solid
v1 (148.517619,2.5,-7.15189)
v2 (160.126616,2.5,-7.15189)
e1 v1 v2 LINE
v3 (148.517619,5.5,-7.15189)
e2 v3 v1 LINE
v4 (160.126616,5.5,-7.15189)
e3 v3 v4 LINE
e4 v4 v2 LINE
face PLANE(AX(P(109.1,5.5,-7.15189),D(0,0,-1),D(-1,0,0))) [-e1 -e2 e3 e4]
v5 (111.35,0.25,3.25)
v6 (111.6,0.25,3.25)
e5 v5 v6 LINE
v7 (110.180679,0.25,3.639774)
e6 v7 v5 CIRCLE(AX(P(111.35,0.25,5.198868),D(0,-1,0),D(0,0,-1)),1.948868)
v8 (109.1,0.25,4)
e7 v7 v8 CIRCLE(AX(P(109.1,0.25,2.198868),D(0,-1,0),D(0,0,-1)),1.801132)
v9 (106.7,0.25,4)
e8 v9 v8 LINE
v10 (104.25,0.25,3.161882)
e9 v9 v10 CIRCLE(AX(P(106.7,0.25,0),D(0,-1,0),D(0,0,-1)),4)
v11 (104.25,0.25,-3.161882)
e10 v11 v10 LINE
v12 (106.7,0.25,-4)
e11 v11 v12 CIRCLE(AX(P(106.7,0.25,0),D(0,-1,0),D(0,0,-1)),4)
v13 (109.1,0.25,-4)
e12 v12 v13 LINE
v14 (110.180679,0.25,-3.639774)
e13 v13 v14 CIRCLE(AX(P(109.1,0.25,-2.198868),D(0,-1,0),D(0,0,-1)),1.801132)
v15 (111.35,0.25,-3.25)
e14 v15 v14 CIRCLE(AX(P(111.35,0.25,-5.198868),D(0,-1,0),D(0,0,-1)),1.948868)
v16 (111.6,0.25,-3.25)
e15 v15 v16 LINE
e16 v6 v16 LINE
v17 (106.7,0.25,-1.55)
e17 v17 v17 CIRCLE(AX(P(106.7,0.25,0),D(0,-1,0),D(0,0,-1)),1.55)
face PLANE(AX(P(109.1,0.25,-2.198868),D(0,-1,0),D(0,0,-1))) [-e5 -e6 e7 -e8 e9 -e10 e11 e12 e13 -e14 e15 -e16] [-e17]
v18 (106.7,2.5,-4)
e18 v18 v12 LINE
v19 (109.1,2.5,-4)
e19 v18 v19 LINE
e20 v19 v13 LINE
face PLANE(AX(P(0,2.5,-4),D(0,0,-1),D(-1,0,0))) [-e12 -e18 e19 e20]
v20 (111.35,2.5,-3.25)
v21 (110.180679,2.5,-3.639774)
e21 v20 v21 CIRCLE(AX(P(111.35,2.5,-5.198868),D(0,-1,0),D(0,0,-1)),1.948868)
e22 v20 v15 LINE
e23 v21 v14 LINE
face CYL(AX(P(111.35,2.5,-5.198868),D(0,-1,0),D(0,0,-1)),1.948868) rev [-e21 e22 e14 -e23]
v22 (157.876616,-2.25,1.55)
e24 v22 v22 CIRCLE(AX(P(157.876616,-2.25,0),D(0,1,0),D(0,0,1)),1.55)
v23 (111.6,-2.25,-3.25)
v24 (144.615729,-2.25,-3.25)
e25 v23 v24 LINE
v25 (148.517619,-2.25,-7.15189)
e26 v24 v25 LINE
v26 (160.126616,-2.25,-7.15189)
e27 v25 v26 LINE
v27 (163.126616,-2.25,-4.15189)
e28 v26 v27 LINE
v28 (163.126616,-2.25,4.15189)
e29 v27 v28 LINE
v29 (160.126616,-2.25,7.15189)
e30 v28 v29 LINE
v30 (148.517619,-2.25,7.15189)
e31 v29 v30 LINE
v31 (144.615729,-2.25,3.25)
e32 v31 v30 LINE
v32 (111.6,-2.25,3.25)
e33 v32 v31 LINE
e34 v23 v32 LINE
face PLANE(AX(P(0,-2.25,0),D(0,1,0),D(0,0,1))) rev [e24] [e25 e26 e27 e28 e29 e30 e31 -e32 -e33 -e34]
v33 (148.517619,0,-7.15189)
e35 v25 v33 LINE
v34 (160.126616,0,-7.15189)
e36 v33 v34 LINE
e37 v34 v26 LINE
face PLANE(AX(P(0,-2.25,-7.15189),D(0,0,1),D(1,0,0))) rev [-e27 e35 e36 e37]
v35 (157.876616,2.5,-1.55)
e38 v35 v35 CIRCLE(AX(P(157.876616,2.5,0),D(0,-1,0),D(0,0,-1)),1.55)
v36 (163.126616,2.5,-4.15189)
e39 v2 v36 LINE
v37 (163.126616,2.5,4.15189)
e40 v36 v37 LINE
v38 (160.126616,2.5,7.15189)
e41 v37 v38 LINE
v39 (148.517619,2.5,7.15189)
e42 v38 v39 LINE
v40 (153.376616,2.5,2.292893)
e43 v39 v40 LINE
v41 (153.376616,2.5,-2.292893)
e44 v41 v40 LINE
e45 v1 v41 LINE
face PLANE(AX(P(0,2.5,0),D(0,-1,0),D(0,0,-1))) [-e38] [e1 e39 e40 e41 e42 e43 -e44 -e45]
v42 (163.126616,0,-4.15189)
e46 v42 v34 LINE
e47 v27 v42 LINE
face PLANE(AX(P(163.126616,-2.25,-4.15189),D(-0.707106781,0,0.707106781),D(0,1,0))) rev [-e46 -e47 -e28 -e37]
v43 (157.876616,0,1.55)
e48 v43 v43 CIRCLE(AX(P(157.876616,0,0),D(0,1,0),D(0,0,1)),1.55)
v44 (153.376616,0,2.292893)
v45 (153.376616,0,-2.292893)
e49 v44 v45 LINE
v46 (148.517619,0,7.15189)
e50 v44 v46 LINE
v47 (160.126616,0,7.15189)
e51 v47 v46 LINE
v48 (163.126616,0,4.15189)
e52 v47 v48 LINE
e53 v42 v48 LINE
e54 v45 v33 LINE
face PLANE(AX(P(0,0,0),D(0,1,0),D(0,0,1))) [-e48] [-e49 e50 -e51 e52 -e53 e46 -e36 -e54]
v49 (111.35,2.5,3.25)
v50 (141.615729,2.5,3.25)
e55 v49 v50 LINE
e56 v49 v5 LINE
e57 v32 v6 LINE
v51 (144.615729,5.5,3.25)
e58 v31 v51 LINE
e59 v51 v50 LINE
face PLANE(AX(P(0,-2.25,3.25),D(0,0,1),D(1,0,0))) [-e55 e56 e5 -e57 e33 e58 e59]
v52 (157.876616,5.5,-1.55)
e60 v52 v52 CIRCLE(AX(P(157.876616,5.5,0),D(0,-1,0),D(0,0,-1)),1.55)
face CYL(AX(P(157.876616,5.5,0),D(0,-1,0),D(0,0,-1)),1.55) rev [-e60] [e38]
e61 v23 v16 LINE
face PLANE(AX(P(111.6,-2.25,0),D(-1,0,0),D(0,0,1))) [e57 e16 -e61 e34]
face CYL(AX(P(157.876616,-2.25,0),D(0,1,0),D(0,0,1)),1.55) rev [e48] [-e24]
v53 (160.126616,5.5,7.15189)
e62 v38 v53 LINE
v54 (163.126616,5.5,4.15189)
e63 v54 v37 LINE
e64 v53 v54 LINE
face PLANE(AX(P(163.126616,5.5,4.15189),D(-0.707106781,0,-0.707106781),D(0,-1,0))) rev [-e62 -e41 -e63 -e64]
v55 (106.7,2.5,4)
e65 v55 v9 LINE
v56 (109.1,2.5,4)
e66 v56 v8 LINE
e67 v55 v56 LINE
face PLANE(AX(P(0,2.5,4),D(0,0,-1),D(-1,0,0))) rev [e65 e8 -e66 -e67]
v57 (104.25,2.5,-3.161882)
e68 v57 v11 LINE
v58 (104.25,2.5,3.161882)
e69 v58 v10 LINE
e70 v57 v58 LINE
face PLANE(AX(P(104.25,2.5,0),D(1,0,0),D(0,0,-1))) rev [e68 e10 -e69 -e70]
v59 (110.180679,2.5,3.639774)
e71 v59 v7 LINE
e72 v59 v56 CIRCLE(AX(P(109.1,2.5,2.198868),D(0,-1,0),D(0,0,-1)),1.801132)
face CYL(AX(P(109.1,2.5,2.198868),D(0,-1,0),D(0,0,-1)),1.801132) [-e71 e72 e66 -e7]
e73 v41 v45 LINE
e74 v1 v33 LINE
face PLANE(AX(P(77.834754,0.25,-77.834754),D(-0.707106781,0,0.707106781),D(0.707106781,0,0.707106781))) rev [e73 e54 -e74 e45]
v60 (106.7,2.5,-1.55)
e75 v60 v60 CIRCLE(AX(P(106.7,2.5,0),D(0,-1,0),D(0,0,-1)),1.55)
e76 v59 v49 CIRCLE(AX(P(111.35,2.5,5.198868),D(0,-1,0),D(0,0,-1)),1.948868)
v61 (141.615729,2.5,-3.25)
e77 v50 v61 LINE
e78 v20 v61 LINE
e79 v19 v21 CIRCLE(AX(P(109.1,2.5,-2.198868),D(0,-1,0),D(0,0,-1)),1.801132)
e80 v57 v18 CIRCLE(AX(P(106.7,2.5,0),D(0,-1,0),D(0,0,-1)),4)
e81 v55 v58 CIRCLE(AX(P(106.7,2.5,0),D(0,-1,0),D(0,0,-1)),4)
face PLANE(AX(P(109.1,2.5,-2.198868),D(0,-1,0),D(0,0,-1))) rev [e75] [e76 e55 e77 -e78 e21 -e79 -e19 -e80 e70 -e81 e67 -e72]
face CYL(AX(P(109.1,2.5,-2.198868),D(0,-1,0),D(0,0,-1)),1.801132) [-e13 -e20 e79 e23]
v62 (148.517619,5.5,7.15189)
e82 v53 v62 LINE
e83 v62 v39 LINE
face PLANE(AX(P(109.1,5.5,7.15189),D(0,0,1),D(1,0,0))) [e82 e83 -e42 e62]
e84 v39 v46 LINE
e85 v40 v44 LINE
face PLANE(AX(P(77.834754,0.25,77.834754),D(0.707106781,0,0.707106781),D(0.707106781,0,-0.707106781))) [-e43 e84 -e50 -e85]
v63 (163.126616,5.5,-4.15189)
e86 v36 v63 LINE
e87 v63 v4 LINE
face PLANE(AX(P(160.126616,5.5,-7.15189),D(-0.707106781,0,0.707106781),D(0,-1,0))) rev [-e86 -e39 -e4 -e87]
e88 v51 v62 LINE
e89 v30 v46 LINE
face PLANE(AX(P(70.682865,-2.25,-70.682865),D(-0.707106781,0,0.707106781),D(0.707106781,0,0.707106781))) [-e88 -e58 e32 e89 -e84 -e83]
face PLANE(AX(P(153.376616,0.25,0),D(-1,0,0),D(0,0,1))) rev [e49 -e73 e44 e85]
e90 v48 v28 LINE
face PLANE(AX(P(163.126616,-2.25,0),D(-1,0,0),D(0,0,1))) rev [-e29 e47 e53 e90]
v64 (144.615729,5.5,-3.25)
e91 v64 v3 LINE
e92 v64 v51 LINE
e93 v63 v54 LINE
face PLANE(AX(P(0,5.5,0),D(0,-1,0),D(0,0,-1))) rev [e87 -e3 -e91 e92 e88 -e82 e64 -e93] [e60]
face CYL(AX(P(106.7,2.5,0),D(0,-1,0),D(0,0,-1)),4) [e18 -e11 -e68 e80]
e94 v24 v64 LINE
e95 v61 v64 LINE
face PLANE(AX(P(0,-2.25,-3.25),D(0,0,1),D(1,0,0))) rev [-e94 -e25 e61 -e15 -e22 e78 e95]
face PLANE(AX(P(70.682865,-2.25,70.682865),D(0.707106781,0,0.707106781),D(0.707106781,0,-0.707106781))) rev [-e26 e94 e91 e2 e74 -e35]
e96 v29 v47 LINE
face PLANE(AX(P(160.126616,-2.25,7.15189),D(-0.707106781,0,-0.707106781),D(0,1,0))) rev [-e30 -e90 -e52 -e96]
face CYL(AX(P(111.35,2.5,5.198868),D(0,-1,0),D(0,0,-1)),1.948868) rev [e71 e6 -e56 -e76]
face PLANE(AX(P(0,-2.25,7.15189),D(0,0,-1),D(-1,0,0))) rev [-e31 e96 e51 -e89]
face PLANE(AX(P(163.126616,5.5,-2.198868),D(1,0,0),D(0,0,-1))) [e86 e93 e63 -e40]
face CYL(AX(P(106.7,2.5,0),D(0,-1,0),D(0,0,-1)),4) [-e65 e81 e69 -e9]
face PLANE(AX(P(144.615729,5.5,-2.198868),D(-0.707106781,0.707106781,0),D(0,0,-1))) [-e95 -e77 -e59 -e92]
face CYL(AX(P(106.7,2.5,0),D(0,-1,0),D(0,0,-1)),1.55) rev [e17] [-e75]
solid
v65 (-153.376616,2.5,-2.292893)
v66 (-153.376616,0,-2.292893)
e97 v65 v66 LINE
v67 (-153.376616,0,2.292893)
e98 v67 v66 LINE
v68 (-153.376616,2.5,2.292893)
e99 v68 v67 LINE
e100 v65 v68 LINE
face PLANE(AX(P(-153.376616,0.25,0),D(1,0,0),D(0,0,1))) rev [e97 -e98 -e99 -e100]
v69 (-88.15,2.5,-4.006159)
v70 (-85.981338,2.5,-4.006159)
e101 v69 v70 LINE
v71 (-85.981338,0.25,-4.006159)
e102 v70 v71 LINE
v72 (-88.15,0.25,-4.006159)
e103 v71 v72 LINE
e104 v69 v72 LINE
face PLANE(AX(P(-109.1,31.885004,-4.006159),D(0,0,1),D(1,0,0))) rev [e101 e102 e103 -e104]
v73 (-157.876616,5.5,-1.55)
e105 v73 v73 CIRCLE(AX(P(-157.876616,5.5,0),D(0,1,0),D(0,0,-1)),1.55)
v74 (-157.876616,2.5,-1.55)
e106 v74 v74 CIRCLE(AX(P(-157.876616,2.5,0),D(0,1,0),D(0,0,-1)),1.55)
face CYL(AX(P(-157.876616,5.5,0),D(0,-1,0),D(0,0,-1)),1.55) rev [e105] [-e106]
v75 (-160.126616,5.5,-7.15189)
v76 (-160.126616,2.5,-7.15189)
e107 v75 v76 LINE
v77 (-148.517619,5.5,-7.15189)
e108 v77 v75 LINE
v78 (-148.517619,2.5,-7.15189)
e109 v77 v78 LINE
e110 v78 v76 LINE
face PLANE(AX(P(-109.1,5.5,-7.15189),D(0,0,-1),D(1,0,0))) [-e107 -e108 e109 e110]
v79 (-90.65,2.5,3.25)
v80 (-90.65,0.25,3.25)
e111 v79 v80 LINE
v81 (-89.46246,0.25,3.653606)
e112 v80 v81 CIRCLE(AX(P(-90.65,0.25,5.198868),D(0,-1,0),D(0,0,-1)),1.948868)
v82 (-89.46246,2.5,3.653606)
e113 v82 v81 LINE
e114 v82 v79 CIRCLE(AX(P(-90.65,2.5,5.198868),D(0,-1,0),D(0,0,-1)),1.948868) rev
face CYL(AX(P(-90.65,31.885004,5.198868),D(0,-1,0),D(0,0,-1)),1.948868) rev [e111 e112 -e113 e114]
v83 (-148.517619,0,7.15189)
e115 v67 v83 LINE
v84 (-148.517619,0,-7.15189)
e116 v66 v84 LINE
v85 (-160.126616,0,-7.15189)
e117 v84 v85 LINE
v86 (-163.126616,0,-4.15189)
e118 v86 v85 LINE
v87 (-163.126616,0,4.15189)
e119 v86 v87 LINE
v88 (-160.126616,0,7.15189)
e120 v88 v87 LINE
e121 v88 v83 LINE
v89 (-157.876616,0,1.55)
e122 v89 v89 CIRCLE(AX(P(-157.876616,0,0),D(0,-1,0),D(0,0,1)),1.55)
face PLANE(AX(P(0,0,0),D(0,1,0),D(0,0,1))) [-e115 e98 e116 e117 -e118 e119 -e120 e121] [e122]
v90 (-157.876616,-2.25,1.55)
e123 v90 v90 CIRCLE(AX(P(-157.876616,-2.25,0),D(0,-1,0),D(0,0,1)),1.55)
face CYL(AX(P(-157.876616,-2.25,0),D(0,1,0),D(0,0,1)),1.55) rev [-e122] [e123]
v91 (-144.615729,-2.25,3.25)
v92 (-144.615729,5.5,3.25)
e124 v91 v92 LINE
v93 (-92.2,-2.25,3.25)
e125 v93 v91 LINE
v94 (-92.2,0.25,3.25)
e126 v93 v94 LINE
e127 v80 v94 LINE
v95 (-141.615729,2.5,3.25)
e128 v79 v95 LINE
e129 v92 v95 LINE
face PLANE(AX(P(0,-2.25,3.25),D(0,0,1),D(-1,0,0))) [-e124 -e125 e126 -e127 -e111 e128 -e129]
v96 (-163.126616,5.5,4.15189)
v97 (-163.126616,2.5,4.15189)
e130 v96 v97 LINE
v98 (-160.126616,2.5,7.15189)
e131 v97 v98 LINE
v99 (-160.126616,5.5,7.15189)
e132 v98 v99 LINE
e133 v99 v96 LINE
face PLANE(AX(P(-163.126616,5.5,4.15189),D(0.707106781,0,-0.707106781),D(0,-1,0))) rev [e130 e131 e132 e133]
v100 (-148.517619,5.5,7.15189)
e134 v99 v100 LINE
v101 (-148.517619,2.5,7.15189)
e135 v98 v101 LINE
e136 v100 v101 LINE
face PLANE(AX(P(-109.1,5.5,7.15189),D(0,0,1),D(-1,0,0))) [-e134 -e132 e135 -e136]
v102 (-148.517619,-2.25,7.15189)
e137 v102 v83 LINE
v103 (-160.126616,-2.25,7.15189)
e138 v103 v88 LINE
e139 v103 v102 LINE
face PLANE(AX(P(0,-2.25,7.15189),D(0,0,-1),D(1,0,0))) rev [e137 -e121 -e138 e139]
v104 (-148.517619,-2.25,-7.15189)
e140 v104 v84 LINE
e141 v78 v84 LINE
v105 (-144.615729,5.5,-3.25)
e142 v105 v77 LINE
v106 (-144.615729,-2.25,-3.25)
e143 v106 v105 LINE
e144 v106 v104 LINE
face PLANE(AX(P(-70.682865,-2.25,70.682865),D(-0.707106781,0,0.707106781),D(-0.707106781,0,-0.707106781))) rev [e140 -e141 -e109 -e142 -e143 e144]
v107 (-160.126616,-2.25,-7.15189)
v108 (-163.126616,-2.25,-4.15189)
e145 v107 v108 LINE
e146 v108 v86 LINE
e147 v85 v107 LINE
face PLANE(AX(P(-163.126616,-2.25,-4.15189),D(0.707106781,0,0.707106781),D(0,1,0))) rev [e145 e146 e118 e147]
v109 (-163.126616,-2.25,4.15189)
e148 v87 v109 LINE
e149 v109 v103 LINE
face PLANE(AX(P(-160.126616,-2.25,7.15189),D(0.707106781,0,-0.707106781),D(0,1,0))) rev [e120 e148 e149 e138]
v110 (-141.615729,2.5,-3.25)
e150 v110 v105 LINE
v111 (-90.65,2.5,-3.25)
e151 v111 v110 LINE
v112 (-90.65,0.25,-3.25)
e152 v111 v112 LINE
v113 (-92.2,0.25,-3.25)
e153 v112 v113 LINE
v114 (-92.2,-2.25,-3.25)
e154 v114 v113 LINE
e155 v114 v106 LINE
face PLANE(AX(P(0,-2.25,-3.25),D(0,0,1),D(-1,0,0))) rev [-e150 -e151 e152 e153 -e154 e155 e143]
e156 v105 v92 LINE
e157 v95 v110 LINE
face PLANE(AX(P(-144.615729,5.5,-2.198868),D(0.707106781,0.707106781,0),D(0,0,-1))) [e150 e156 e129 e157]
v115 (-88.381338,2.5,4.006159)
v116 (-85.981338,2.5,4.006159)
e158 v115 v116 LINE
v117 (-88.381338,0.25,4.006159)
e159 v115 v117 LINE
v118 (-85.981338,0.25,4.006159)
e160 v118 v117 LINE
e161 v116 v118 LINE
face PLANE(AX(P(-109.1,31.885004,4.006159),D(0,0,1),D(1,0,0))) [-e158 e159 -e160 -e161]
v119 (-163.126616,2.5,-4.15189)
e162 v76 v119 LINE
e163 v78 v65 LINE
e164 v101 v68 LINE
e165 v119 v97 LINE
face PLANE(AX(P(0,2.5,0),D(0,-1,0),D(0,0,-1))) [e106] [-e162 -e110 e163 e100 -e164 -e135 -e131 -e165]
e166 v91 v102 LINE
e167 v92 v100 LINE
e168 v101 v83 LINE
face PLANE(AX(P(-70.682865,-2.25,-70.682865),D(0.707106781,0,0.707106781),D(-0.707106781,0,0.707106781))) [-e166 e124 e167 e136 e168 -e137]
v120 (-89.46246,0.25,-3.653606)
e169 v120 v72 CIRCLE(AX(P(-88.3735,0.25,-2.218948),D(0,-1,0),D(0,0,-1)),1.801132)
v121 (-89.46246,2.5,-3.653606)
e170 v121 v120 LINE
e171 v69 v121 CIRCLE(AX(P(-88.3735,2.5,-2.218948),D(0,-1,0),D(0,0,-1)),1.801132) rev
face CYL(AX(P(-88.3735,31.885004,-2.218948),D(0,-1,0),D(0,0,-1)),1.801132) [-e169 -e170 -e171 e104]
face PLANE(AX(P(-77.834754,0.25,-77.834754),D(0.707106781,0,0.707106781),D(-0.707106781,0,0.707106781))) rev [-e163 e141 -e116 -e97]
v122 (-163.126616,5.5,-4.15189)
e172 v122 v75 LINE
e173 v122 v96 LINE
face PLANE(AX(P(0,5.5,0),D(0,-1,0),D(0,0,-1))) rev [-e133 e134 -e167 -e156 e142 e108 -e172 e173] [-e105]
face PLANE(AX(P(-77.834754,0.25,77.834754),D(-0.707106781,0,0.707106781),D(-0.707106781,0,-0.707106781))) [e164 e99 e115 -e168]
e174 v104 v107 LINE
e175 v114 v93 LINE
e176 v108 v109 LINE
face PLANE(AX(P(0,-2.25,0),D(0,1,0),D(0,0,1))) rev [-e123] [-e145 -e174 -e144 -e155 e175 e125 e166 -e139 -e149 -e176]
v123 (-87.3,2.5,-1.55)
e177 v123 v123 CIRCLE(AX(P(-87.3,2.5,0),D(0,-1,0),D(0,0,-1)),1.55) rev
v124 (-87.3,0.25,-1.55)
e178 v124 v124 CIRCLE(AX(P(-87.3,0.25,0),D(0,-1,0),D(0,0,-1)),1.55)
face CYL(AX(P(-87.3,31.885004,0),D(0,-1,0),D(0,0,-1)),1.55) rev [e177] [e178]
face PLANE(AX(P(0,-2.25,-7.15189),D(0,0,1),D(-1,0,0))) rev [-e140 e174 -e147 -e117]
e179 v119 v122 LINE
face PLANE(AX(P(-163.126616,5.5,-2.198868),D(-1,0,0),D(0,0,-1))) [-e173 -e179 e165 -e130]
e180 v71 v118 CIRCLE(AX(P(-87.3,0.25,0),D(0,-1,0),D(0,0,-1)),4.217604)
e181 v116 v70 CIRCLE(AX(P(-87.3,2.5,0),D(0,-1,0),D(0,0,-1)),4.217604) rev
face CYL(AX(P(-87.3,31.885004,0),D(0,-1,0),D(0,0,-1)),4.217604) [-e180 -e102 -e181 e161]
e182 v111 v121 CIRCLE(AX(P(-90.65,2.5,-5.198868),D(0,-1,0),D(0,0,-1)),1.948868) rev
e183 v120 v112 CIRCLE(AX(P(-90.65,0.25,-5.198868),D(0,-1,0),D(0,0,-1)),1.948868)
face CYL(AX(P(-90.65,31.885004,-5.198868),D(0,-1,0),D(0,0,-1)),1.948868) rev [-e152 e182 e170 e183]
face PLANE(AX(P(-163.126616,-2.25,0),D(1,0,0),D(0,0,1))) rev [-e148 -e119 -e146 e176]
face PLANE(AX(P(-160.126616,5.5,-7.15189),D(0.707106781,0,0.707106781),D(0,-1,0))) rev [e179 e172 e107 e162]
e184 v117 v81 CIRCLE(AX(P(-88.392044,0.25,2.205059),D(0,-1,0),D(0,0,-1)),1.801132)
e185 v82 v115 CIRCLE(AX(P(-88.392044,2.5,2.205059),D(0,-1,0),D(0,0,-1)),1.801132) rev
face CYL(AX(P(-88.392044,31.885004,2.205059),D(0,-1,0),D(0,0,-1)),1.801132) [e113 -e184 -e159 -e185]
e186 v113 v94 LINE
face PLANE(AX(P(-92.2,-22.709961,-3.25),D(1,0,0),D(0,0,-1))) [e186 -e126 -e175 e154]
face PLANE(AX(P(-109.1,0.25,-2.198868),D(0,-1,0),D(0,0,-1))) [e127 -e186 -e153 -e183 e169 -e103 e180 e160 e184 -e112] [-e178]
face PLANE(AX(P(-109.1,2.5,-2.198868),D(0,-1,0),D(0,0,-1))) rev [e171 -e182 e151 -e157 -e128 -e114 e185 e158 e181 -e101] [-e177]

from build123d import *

# Parameters (mm, degrees)
SKETCH_577_R                   = 1.55
EXTRUDE_1486_DEPTH             = 2.25
EXTRUDE_1550_DEPTH             = 0.25
EXTRUDE_START                  = 0.25
SKETCH_3_R                     = 1.55
EXTRUDE_1865_DEPTH             = 2.25
EXTRUDE_START_2                = 5.5
SKETCH_5_R                     = 1.55
EXTRUDE_4_DEPTH                = 3
CHAMFER_1_SIZE                 = 3
CHAMFER_2_SIZE                 = 3
SKETCH_6_W                     = 8.98980632
SKETCH_6_H                     = 4.173657757
CUT_EXTRUDE_3129_DEPTH         = 164.375923072
SKETCH_4_2_W                   = 20.7
SKETCH_4_2_H                   = 6.5
SKETCH_4_2_R                   = 1.55
EXTRUDE_4092_DEPTH             = 2.25
EXTRUDE_4420_REACH             = 165.376
SKETCH_7_W                     = 19.4
SKETCH_7_H                     = 6.5
EXTRUDE_4420_DIRECTION_2_REACH = 165.376


with BuildPart() as part:
    # Sketch 577 → Extrude 1486 (new body)
    with BuildSketch(Plane(origin=(0, 0, 0), x_dir=(1, 0, 0), z_dir=(0, 1, 0))):
        Polygon((144.615729025, 3.25), (111.6, 3.25), (111.6, -3.25), (144.615729025, -3.25), (148.517618913, -7.151889887), (163.12661558, -7.151889887), (163.12661558, 7.151889887), (148.517618913, 7.151889887), align=None)
        with Locations(Location((157.87661558, 0, 0), (0, 0, 270))):
            Circle(SKETCH_577_R, mode=Mode.SUBTRACT)
    extrude(amount=-EXTRUDE_1486_DEPTH)

    # Sketch 4 → Extrude 1550 (add)
    with BuildSketch(Plane(origin=(0, 0, 0), x_dir=(1, 0, 0), z_dir=(0, 1, 0))):
        Polygon((144.615729025, 3.25), (111.6, 3.25), (111.6, -3.25), (144.615729025, -3.25), (148.517618913, -7.151889887), (153.376615581, -2.292893219), (153.376615581, 2.292893219), (148.517618913, 7.151889887), align=None)
    extrude(amount=EXTRUDE_1550_DEPTH)

    # 主结构-草图<3> → Extrude 1865 (add)
    with BuildSketch(Plane(origin=(0, 0, 0), x_dir=(1, 0, 0), z_dir=(0, 1, 0)).offset(EXTRUDE_START)):
        with BuildLine():
            ThreePointArc((111.35, 3.25), (110.733713943, 3.350009459), (110.180679422, 3.639773526))
            ThreePointArc((110.180679422, 3.639773526), (109.669568065, 3.907571827), (109.1, 4))
            Line((109.1, 4), (106.7, 4))
            ThreePointArc((106.7, 4), (105.40530494, 3.78467498), (104.25, 3.161882351))
            Line((104.25, 3.161882351), (104.25, -3.161882351))
            ThreePointArc((104.25, -3.161882351), (105.40530494, -3.78467498), (106.7, -4))
            Line((106.7, -4), (109.1, -4))
            ThreePointArc((109.1, -4), (109.669568065, -3.907571827), (110.180679422, -3.639773526))
            ThreePointArc((110.180679422, -3.639773526), (110.733713943, -3.350009459), (111.35, -3.25))
            Line((111.35, -3.25), (144.615729025, -3.25))
            Line((144.615729025, -3.25), (148.517618913, -7.151889887))
            Line((148.517618913, -7.151889887), (153.376615581, -2.292893219))
            Line((153.376615581, -2.292893219), (153.376615581, 2.292893219))
            Line((153.376615581, 2.292893219), (148.517618913, 7.151889887))
            Line((148.517618913, 7.151889887), (144.615729025, 3.25))
            Line((144.615729025, 3.25), (111.35, 3.25))
        make_face()
        with Locations(Location((106.7, 0, 0), (0, 0, 90))):
            Circle(SKETCH_3_R, mode=Mode.SUBTRACT)
    extrude(amount=EXTRUDE_1865_DEPTH)

    # 主结构-草图<5> → 凸台-拉伸4 (add)
    # profile 1 of 2: a face of its own
    with BuildSketch(Plane(origin=(0, 0, 0), x_dir=(1, 0, 0), z_dir=(0, 1, 0)).offset(EXTRUDE_START_2)):
        Polygon((144.615729025, 3.25), (148.517618913, 7.151889887), (153.376615581, 2.292893219), (153.376615581, -2.292893219), (148.517618913, -7.151889887), (144.615729025, -3.25), align=None)
    # profile 2 of 2: a face of its own
    with BuildSketch(Plane(origin=(0, 0, 0), x_dir=(1, 0, 0), z_dir=(0, 1, 0)).offset(EXTRUDE_START_2)):
        Polygon((163.12661558, -7.151889887), (148.517618913, -7.151889887), (153.376615581, -2.292893219), (153.376615581, 2.292893219), (148.517618913, 7.151889887), (163.12661558, 7.151889887), align=None)
        with Locations(Location((157.87661558, 0, 0), (0, 0, 270))):
            Circle(SKETCH_5_R, mode=Mode.SUBTRACT)
    extrude(amount=-EXTRUDE_4_DEPTH)

    # 倒角1
    # the kernel refuses this chamfer: 3 mm, written as the material it adds along each edge
    with BuildSketch(Plane(origin=(144.615729025, 2.5, 3.25), x_dir=(-0.9996219169112968, -0.027495876610586462, 0), z_dir=(0, 0, -1))) as chamfer_1_piece_1_section:
        Polygon((CHAMFER_1_SIZE * 0.999621916911, CHAMFER_1_SIZE * 0.0274958766106), (-CHAMFER_1_SIZE * 0.0274958766106, CHAMFER_1_SIZE * 0.999621916911), (0, 0), align=None)
    chamfer_1_piece_1 = extrude(amount=6.5, mode=Mode.PRIVATE)
    chamfer_1_piece_1 = split(chamfer_1_piece_1, bisect_by=Plane(origin=(143.442838303, 3.183373084, 2.077109278), z_dir=(-0.7071067811865577, 0, 0.7071067811865375)), keep=Keep.TOP, mode=Mode.PRIVATE)
    add(chamfer_1_piece_1)
    with BuildSketch(Plane(origin=(144.615729025, 2.5, 3.25), x_dir=(-0.9996219169112968, -0.027495876610586462, 0), z_dir=(0, 0, -1))) as chamfer_1_piece_2_section:
        Polygon((CHAMFER_1_SIZE * 0.999621916911, CHAMFER_1_SIZE * 0.0274958766106), (-CHAMFER_1_SIZE * 0.0274958766106, CHAMFER_1_SIZE * 0.999621916911), (0, 0), align=None)
    chamfer_1_piece_2 = extrude(amount=6.5, mode=Mode.PRIVATE)
    chamfer_1_piece_2 = split(chamfer_1_piece_2, bisect_by=Plane(origin=(142.621093837, 3.61900543, -1.255364812), z_dir=(0.7071067811865474, 0, 0.7071067811865477)), keep=Keep.TOP, mode=Mode.PRIVATE)
    chamfer_1_piece_2 = split(chamfer_1_piece_2, bisect_by=Plane(origin=(142.621093837, 3.61900543, 1.255364812), z_dir=(0.7071067811865577, 0, -0.7071067811865375)), keep=Keep.TOP, mode=Mode.PRIVATE)
    chamfer_1_piece_2 = split(chamfer_1_piece_2, bisect_by=Plane(origin=(143.876458648, 5.5, 0), z_dir=(0, -1, 0)), keep=Keep.TOP, mode=Mode.PRIVATE)
    add(chamfer_1_piece_2)
    with BuildSketch(Plane(origin=(144.615729025, 2.5, 3.25), x_dir=(-0.9996219169112968, -0.027495876610586462, 0), z_dir=(0, 0, -1))) as chamfer_1_piece_3_section:
        Polygon((CHAMFER_1_SIZE * 0.999621916911, CHAMFER_1_SIZE * 0.0274958766106), (-CHAMFER_1_SIZE * 0.0274958766106, CHAMFER_1_SIZE * 0.999621916911), (0, 0), align=None)
    chamfer_1_piece_3 = extrude(amount=6.5, mode=Mode.PRIVATE)
    chamfer_1_piece_3 = split(chamfer_1_piece_3, bisect_by=Plane(origin=(143.442838303, 3.183373084, -2.077109278), z_dir=(-0.7071067811865474, 0, -0.7071067811865477)), keep=Keep.TOP, mode=Mode.PRIVATE)
    add(chamfer_1_piece_3)

    # 倒角2
    chamfer_2_edges = [part.edges().sort_by_distance(p)[0] for p in [
        (163.12661558, -1.125, -7.151889887),
        (163.12661558, -1.125, 7.151889887),
        (163.12661558, 4, 7.151889887),
        (163.12661558, 4, -7.151889887),
    ]]
    chamfer(chamfer_2_edges, length=CHAMFER_2_SIZE)


with BuildPart() as body_2:
    # 镜向1: mirrored copy
    add(part.part.mirror(Plane(origin=(0, 0, 0), x_dir=(0, 0, 1), z_dir=(1, 0, 0))))

    # 草图6 → Cut-Extrude 3129 (cut, through all)
    with BuildSketch(Plane(origin=(0, 0, 0), x_dir=(1, 0, 0), z_dir=(0, 1, 0))):
        with Locations((-106.85509684, 5.336828879)):
            Rectangle(SKETCH_6_W, SKETCH_6_H)
        with Locations((-106.85509684, -5.336828879)):
            Rectangle(SKETCH_6_W, SKETCH_6_H)
    extrude(amount=CUT_EXTRUDE_3129_DEPTH, mode=Mode.SUBTRACT)

    # Sketch 4 2 → Extrude 4092 (add)
    # profile 1 of 2: a face of its own
    with BuildSketch(Plane(origin=(0, 0, 0), x_dir=(1, 0, 0), z_dir=(0, 1, 0)).offset(EXTRUDE_START)):
        with Locations((-101, 0)):
            Rectangle(SKETCH_4_2_W, SKETCH_4_2_H)
    # profile 2 of 2: a face of its own
    with BuildSketch(Plane(origin=(0, 0, 0), x_dir=(1, 0, 0), z_dir=(0, 1, 0)).offset(EXTRUDE_START)):
        with BuildLine():
            ThreePointArc((-85.981337923, 4.006159445), (-83.082396039, 0), (-85.981337923, -4.006159445))
            Line((-85.981337923, -4.006159445), (-88.381337923, -4.006159445))
            ThreePointArc((-88.381337923, -4.006159445), (-88.950452521, -3.917442693), (-89.462460405, -3.653605597))
            ThreePointArc((-89.462460405, -3.653605597), (-90.022874062, -3.35365813), (-90.65, -3.25))
            Line((-90.65, -3.25), (-90.65, 3.25))
            ThreePointArc((-90.65, 3.25), (-90.022874062, 3.35365813), (-89.462460405, 3.653605597))
            ThreePointArc((-89.462460405, 3.653605597), (-88.84075687, 3.95841575), (-88.15, 4.006159445))
            Line((-88.15, 4.006159445), (-85.981337923, 4.006159445))
        make_face()
        with Locations(Location((-87.3, 0, 0), (0, 0, 90))):
            Circle(SKETCH_4_2_R, mode=Mode.SUBTRACT)
    extrude(amount=EXTRUDE_4092_DEPTH)

    # 草图7 → Extrude 4420 (add, up to next)
    with BuildSketch(Plane(origin=(0, 0, 0), x_dir=(1, 0, 0), z_dir=(0, 1, 0)), mode=Mode.PRIVATE) as extrude_4420_sk1:
        with Locations((-101.9, 0)):
            Rectangle(SKETCH_7_W, SKETCH_7_H)
    extrude_4420_tool1 = extrude(extrude_4420_sk1.sketch, amount=EXTRUDE_4420_REACH, mode=Mode.PRIVATE) - body_2.part
    add(extrude_4420_tool1.solids().sort_by_distance((-101.9, 0, 0))[0])

    # Extrude 4420 direction 2: up to this face of the body (flat: up to its plane)
    extrude_4420_direction_2_end = Plane(body_2.part.faces().sort_by_distance((-141.556120838, -2.25, 0))[0])
    # 草图7 → Extrude 4420 direction 2 (add, up to the picked face)
    with BuildSketch(Plane(origin=(0, 0, 0), x_dir=(1, 0, 0), z_dir=(0, 1, 0)), mode=Mode.PRIVATE) as extrude_4420_direction_2_sk1:
        with Locations((-101.9, 0)):
            Rectangle(SKETCH_7_W, SKETCH_7_H)
    extrude_4420_direction_2_tool1 = split(extrude(extrude_4420_direction_2_sk1.sketch, amount=-EXTRUDE_4420_DIRECTION_2_REACH, mode=Mode.PRIVATE), bisect_by=extrude_4420_direction_2_end, keep=Keep.BOTH, mode=Mode.PRIVATE)
    add(extrude_4420_direction_2_tool1.solids().sort_by(Axis((-101.9, 0, 0), (0, -1, 0)))[0])


solid = Compound([part.part, body_2.part])
